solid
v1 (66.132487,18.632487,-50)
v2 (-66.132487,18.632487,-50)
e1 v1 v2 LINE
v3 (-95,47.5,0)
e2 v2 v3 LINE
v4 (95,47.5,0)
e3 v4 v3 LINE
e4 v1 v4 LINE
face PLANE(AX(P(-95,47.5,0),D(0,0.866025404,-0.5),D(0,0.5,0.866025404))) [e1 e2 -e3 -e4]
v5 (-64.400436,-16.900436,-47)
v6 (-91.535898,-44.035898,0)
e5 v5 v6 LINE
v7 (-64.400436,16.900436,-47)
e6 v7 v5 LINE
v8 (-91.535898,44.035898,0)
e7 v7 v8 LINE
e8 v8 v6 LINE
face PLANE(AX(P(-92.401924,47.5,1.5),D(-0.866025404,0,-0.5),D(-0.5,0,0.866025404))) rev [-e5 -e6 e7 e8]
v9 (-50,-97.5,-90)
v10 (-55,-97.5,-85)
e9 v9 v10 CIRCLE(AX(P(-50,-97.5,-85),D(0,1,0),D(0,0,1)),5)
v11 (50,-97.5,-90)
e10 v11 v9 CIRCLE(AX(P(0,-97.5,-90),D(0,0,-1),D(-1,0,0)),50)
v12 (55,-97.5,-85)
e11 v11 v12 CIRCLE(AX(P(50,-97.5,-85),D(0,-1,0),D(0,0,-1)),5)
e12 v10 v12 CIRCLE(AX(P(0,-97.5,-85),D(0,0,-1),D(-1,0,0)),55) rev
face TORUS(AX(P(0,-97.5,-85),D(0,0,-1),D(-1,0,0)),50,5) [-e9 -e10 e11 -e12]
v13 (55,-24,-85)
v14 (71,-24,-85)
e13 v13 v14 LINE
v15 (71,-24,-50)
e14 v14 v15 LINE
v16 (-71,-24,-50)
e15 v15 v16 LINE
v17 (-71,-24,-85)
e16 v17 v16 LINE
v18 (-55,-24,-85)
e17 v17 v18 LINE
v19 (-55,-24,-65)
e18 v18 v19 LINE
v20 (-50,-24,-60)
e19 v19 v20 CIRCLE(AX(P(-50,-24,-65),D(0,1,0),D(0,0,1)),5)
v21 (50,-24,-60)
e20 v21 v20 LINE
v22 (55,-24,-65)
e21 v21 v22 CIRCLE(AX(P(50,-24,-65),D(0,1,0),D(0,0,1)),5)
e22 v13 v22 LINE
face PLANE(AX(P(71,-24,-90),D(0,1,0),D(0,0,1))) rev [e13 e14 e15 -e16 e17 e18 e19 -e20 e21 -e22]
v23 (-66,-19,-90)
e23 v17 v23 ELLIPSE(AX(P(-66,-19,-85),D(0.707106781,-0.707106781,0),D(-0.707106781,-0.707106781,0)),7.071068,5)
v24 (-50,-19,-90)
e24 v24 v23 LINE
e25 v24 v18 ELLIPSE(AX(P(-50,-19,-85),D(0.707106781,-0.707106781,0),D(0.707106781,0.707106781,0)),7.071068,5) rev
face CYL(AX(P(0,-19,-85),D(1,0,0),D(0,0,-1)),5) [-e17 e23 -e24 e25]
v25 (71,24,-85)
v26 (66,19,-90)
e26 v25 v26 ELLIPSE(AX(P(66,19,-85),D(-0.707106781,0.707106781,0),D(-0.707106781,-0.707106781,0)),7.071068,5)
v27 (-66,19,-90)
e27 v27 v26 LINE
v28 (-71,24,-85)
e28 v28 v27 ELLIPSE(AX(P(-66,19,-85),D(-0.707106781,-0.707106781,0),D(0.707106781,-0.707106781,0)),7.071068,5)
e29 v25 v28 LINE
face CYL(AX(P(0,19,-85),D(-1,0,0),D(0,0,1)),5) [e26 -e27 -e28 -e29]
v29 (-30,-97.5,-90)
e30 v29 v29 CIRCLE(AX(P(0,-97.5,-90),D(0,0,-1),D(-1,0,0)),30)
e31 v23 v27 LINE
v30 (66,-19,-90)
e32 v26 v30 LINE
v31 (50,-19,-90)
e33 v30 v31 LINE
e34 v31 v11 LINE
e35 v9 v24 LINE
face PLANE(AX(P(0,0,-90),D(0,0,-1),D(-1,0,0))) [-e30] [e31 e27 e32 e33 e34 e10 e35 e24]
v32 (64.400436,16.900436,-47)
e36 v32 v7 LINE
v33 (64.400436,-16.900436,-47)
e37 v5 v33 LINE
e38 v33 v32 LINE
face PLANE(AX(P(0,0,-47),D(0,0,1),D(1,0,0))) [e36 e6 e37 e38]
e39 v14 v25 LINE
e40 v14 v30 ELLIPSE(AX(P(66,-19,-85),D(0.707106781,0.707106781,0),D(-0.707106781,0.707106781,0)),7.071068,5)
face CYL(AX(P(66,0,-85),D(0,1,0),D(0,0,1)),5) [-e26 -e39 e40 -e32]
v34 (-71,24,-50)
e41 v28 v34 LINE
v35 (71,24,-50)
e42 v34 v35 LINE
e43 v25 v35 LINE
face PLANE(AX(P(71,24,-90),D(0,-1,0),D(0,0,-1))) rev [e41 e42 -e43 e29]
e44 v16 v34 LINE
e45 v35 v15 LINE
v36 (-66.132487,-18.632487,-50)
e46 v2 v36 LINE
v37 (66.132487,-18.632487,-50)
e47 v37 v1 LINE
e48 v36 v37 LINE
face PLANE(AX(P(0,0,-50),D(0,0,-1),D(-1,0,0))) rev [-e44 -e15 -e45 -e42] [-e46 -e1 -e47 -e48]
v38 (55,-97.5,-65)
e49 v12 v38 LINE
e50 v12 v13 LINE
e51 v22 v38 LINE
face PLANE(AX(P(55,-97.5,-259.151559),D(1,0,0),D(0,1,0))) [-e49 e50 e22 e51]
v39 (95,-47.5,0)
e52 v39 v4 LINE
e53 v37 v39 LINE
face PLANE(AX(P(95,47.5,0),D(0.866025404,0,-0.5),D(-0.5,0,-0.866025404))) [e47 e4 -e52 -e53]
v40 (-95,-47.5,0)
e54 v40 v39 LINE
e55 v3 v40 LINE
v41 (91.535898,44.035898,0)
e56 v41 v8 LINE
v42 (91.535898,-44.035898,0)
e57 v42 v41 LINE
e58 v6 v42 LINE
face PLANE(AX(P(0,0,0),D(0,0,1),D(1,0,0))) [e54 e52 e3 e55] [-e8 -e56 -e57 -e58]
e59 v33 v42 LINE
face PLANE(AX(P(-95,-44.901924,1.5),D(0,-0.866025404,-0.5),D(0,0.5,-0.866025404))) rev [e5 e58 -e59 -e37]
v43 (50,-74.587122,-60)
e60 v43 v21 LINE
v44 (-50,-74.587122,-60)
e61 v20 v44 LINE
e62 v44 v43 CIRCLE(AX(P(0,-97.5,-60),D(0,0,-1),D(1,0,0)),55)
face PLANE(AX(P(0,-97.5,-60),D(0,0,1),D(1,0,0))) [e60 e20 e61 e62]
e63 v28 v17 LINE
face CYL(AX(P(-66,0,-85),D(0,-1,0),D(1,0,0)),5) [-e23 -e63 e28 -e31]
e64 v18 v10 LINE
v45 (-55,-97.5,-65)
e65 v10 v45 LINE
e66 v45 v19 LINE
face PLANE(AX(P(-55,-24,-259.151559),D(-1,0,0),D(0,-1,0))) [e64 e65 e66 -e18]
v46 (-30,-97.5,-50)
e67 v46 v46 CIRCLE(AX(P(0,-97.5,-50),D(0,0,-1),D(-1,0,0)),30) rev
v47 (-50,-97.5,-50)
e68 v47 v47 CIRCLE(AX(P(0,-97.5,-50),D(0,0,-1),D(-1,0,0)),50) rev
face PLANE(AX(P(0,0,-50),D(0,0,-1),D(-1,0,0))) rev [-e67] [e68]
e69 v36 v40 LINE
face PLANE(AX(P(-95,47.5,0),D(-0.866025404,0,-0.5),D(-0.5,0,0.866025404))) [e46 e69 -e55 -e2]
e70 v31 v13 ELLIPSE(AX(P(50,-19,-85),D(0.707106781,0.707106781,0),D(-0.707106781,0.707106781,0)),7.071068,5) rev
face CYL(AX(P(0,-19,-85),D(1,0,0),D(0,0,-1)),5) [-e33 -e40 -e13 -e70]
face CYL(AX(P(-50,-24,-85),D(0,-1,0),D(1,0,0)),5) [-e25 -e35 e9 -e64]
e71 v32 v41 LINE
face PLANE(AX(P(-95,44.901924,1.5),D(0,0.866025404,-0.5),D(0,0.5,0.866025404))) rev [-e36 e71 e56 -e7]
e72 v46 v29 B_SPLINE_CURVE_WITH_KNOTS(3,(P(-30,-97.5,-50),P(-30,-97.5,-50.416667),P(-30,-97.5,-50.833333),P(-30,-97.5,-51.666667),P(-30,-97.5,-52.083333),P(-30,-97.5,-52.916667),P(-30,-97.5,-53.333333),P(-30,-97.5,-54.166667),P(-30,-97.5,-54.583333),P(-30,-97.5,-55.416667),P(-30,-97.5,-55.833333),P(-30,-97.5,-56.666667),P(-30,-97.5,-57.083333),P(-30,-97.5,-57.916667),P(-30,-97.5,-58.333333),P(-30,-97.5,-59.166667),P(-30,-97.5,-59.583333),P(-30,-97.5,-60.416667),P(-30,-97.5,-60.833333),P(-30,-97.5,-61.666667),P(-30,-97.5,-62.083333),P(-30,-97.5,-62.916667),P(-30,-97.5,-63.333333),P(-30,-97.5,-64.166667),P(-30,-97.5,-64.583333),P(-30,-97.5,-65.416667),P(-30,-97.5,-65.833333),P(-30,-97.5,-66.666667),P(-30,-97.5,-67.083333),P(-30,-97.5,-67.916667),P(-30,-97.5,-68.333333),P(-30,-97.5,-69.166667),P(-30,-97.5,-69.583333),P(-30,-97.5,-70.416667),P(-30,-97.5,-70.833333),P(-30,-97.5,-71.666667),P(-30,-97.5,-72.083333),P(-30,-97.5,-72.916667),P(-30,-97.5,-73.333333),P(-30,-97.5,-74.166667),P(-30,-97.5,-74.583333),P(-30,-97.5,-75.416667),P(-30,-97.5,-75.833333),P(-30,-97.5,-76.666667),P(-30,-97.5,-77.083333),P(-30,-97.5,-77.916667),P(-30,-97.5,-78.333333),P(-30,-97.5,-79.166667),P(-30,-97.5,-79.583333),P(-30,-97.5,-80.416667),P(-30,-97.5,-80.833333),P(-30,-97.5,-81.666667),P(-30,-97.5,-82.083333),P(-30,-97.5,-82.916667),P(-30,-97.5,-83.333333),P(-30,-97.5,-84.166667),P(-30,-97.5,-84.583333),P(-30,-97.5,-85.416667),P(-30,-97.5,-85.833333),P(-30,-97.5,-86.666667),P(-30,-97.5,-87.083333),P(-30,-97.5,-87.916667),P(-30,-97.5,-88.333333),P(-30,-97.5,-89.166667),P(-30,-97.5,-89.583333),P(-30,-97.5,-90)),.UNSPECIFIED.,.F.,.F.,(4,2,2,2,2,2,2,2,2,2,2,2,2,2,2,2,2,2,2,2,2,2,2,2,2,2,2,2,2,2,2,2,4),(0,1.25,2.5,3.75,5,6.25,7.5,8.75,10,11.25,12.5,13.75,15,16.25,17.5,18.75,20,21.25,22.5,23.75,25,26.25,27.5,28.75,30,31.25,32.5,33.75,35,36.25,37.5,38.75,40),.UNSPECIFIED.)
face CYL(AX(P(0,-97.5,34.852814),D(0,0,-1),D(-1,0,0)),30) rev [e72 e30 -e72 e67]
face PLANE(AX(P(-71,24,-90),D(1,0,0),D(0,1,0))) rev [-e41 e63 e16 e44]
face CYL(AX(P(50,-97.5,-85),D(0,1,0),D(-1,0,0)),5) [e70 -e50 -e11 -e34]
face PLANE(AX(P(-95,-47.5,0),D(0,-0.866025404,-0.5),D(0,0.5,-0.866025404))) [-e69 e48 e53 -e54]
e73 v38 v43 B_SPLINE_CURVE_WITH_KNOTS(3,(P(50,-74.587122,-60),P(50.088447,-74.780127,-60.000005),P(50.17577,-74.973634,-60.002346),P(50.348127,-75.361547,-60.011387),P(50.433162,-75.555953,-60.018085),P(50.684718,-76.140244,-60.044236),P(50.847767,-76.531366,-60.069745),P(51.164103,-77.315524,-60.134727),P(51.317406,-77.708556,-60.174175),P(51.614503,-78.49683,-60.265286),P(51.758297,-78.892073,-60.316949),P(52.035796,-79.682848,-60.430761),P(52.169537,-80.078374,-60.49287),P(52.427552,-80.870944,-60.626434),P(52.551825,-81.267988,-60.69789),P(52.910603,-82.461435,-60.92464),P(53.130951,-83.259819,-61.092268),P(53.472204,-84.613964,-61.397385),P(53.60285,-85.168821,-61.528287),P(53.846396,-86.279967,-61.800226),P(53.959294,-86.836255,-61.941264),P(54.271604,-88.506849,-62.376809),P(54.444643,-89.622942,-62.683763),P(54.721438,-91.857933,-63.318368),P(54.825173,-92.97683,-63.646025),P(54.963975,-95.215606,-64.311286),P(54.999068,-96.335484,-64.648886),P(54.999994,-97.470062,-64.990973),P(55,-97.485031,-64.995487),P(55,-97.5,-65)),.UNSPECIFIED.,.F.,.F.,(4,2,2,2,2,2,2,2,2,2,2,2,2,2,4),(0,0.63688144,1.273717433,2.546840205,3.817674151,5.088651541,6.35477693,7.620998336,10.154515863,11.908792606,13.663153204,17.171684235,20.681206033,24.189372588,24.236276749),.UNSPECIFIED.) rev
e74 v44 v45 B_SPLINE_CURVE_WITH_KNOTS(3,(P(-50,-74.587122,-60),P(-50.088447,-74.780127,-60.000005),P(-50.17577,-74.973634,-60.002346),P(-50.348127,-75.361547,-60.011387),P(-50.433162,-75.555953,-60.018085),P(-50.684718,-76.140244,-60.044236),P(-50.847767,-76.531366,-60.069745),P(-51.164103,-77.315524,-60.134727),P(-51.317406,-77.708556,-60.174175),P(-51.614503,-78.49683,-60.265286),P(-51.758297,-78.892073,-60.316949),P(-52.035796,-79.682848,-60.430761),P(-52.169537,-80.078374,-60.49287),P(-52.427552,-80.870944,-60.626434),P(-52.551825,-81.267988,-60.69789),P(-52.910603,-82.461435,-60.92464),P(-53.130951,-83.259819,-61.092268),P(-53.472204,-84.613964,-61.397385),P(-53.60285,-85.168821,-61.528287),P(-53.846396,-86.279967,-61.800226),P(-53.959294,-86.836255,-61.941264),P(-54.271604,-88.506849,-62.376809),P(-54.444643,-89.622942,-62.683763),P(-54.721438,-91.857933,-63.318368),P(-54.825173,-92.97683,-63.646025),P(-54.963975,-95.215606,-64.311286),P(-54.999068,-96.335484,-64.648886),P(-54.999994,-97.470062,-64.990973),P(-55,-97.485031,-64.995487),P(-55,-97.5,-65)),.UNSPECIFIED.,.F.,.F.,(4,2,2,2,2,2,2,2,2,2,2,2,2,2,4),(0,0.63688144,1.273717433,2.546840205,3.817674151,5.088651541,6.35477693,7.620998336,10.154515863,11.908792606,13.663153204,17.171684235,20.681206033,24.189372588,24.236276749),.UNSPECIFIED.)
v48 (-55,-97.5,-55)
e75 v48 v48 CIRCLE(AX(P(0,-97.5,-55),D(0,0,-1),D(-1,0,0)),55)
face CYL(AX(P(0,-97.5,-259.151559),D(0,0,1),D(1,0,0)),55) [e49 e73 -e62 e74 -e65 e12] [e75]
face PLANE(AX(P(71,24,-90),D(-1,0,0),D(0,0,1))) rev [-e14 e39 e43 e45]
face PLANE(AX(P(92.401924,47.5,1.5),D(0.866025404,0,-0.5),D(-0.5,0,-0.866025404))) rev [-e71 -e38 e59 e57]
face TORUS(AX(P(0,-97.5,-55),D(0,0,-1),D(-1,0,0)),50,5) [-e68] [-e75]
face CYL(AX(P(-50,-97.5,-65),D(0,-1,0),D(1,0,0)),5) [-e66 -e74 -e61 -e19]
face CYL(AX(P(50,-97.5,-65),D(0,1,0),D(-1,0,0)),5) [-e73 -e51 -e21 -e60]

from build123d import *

# Parameters (mm, degrees)
LIGHT_PROFILE_W               = 190
LIGHT_PROFILE_H               = 95
LIGHT_EXTRUDE_DEPTH           = 50
LIGHT_EXTRUDE_DRAFT           = -30
LIGHT_SHELL_T                 = -3
ELECTRONICS_BOX_SKETCH_W      = 142
ELECTRONICS_BOX_SKETCH_H      = 48
ELECTRONICS_BOX_EXTRUDE_DEPTH = 40
SUPPORT_EXTRUDE_DEPTH         = 40
BACK_FILLET_R                 = 5
WRIST_HOLE_SKETCH_R           = 30
WRIST_HOLE_CUT_DEPTH          = 40
SUPPORT_INSET_CUT_DEPTH       = 10
FRONT_FILLET_R                = 5


with BuildPart() as part:
    # Light Profile → Light Extrude (with draft: the straight prism first)
    with BuildSketch(Plane.XY):
        Rectangle(LIGHT_PROFILE_W, LIGHT_PROFILE_H)
    extrude(amount=-LIGHT_EXTRUDE_DEPTH)
    # Light Extrude: the draft: its side faces are tilted about the plane it starts from
    light_extrude_sides = [part.faces().sort_by_distance(p)[0] for p in [
        (-95, 0, -25),
        (0, -47.5, -25),
        (95, 0, -25),
        (0, 47.5, -25),
    ]]
    draft(light_extrude_sides, Plane.XY, LIGHT_EXTRUDE_DRAFT)

    # Light Shell
    light_shell_openings = [part.faces().sort_by_distance(p)[0] for p in [
        (0, 0, 0),
    ]]
    offset(amount=LIGHT_SHELL_T, openings=light_shell_openings, kind=Kind.INTERSECTION)

    # Electronics Box Sketch → Electronics Box Extrude (add)
    with BuildSketch(Plane(origin=(0, 0, -50), x_dir=(-1, 0, 0), z_dir=(0, 0, -1))):
        Rectangle(ELECTRONICS_BOX_SKETCH_W, ELECTRONICS_BOX_SKETCH_H)
    extrude(amount=ELECTRONICS_BOX_EXTRUDE_DEPTH)

    # Support Sketch → Support Extrude (add)
    with BuildSketch(Plane.XY.offset(-50)):
        with BuildLine():
            Line((55, -97.5), (55, -24))
            Line((55, -24), (-55, -24))
            Line((-55, -24), (-55, -97.5))
            ThreePointArc((-55, -97.5), (0, -152.5), (55, -97.5))
        make_face()
    extrude(amount=-SUPPORT_EXTRUDE_DEPTH)

    # Back Fillet
    back_fillet_edges = [part.edges().sort_by_distance(p)[0] for p in [
        (-71, 0, -90),
        (0, 24, -90),
        (71, 0, -90),
        (63, -24, -90),
        (-63, -24, -90),
        (55, -60.75, -90),
        (-55, -60.75, -90),
        (0, -152.5, -90),
    ]]
    fillet(back_fillet_edges, radius=BACK_FILLET_R)

    # Wrist Hole Sketch → Wrist Hole Cut (cut)
    with BuildSketch(Plane(origin=(0, 0, -90), x_dir=(-1, 0, 0), z_dir=(0, 0, -1))):
        with Locations((0, -97.5)):
            Circle(WRIST_HOLE_SKETCH_R)
    extrude(amount=-WRIST_HOLE_CUT_DEPTH, mode=Mode.SUBTRACT)

    # Support Inset Sketch → Support Inset Cut (cut)
    with BuildSketch(Plane.XY.offset(-50)):
        with BuildLine():
            Line((-55, -24), (55, -24))
            Line((55, -24), (55, -42.5))
            Line((55, -42.5), (55, -97.5))
            ThreePointArc((55, -97.5), (0, -42.5), (-55, -97.5))
            Line((-55, -97.5), (-55, -42.5))
            Line((-55, -42.5), (-55, -24))
        make_face()
    extrude(amount=-SUPPORT_INSET_CUT_DEPTH, mode=Mode.SUBTRACT)

    # Front Fillet
    # the kernel refuses this fillet: 5 mm, written as the material it takes off along each edge
    with BuildSketch(Plane(origin=(0, -97.5, -50), x_dir=(-1, 0, 0), z_dir=(0, -1, 0))) as front_fillet_piece_1:
        with BuildLine():
            CenterArc((55 - FRONT_FILLET_R, FRONT_FILLET_R), FRONT_FILLET_R, 270, 90)
            Line((55, FRONT_FILLET_R), (55, 0))
            Line((55, 0), (55 - FRONT_FILLET_R, 0))
        make_face()
    revolve(axis=Axis((0, -97.5, -50), (0, 0, -1)), mode=Mode.SUBTRACT)
    with BuildSketch(Plane(origin=(-55, -24, -60), x_dir=(1, 0, 0), z_dir=(0, -1, 0))) as front_fillet_piece_2_section:
        with BuildLine():
            CenterArc((FRONT_FILLET_R, -FRONT_FILLET_R), FRONT_FILLET_R, 90, 90)
            Line((0, -FRONT_FILLET_R), (0, 0))
            Line((0, 0), (FRONT_FILLET_R, 0))
        make_face()
    front_fillet_piece_2 = extrude(amount=86, mode=Mode.PRIVATE)
    front_fillet_piece_2 = front_fillet_piece_2 - Plane(origin=(0, -97.5, -61.160200813), x_dir=(-1, 0, 0), z_dir=(0, 0, 1)) * Cylinder(55, 192, mode=Mode.PRIVATE)
    add(front_fillet_piece_2, mode=Mode.SUBTRACT)
    with BuildSketch(Plane(origin=(55, -110, -60), x_dir=(0, 0, -1), z_dir=(0, 1, 0))) as front_fillet_piece_3_section:
        with BuildLine():
            CenterArc((FRONT_FILLET_R, FRONT_FILLET_R), FRONT_FILLET_R, 180, 90)
            Line((0, FRONT_FILLET_R), (0, 0))
            Line((0, 0), (FRONT_FILLET_R, 0))
        make_face()
    front_fillet_piece_3 = extrude(amount=86, mode=Mode.PRIVATE)
    front_fillet_piece_3 = front_fillet_piece_3 - Plane(origin=(0, -97.5, -61.160225753), x_dir=(-1, 0, 0), z_dir=(0, 0, 1)) * Cylinder(55, 192, mode=Mode.PRIVATE)
    add(front_fillet_piece_3, mode=Mode.SUBTRACT)


solid = part.part
